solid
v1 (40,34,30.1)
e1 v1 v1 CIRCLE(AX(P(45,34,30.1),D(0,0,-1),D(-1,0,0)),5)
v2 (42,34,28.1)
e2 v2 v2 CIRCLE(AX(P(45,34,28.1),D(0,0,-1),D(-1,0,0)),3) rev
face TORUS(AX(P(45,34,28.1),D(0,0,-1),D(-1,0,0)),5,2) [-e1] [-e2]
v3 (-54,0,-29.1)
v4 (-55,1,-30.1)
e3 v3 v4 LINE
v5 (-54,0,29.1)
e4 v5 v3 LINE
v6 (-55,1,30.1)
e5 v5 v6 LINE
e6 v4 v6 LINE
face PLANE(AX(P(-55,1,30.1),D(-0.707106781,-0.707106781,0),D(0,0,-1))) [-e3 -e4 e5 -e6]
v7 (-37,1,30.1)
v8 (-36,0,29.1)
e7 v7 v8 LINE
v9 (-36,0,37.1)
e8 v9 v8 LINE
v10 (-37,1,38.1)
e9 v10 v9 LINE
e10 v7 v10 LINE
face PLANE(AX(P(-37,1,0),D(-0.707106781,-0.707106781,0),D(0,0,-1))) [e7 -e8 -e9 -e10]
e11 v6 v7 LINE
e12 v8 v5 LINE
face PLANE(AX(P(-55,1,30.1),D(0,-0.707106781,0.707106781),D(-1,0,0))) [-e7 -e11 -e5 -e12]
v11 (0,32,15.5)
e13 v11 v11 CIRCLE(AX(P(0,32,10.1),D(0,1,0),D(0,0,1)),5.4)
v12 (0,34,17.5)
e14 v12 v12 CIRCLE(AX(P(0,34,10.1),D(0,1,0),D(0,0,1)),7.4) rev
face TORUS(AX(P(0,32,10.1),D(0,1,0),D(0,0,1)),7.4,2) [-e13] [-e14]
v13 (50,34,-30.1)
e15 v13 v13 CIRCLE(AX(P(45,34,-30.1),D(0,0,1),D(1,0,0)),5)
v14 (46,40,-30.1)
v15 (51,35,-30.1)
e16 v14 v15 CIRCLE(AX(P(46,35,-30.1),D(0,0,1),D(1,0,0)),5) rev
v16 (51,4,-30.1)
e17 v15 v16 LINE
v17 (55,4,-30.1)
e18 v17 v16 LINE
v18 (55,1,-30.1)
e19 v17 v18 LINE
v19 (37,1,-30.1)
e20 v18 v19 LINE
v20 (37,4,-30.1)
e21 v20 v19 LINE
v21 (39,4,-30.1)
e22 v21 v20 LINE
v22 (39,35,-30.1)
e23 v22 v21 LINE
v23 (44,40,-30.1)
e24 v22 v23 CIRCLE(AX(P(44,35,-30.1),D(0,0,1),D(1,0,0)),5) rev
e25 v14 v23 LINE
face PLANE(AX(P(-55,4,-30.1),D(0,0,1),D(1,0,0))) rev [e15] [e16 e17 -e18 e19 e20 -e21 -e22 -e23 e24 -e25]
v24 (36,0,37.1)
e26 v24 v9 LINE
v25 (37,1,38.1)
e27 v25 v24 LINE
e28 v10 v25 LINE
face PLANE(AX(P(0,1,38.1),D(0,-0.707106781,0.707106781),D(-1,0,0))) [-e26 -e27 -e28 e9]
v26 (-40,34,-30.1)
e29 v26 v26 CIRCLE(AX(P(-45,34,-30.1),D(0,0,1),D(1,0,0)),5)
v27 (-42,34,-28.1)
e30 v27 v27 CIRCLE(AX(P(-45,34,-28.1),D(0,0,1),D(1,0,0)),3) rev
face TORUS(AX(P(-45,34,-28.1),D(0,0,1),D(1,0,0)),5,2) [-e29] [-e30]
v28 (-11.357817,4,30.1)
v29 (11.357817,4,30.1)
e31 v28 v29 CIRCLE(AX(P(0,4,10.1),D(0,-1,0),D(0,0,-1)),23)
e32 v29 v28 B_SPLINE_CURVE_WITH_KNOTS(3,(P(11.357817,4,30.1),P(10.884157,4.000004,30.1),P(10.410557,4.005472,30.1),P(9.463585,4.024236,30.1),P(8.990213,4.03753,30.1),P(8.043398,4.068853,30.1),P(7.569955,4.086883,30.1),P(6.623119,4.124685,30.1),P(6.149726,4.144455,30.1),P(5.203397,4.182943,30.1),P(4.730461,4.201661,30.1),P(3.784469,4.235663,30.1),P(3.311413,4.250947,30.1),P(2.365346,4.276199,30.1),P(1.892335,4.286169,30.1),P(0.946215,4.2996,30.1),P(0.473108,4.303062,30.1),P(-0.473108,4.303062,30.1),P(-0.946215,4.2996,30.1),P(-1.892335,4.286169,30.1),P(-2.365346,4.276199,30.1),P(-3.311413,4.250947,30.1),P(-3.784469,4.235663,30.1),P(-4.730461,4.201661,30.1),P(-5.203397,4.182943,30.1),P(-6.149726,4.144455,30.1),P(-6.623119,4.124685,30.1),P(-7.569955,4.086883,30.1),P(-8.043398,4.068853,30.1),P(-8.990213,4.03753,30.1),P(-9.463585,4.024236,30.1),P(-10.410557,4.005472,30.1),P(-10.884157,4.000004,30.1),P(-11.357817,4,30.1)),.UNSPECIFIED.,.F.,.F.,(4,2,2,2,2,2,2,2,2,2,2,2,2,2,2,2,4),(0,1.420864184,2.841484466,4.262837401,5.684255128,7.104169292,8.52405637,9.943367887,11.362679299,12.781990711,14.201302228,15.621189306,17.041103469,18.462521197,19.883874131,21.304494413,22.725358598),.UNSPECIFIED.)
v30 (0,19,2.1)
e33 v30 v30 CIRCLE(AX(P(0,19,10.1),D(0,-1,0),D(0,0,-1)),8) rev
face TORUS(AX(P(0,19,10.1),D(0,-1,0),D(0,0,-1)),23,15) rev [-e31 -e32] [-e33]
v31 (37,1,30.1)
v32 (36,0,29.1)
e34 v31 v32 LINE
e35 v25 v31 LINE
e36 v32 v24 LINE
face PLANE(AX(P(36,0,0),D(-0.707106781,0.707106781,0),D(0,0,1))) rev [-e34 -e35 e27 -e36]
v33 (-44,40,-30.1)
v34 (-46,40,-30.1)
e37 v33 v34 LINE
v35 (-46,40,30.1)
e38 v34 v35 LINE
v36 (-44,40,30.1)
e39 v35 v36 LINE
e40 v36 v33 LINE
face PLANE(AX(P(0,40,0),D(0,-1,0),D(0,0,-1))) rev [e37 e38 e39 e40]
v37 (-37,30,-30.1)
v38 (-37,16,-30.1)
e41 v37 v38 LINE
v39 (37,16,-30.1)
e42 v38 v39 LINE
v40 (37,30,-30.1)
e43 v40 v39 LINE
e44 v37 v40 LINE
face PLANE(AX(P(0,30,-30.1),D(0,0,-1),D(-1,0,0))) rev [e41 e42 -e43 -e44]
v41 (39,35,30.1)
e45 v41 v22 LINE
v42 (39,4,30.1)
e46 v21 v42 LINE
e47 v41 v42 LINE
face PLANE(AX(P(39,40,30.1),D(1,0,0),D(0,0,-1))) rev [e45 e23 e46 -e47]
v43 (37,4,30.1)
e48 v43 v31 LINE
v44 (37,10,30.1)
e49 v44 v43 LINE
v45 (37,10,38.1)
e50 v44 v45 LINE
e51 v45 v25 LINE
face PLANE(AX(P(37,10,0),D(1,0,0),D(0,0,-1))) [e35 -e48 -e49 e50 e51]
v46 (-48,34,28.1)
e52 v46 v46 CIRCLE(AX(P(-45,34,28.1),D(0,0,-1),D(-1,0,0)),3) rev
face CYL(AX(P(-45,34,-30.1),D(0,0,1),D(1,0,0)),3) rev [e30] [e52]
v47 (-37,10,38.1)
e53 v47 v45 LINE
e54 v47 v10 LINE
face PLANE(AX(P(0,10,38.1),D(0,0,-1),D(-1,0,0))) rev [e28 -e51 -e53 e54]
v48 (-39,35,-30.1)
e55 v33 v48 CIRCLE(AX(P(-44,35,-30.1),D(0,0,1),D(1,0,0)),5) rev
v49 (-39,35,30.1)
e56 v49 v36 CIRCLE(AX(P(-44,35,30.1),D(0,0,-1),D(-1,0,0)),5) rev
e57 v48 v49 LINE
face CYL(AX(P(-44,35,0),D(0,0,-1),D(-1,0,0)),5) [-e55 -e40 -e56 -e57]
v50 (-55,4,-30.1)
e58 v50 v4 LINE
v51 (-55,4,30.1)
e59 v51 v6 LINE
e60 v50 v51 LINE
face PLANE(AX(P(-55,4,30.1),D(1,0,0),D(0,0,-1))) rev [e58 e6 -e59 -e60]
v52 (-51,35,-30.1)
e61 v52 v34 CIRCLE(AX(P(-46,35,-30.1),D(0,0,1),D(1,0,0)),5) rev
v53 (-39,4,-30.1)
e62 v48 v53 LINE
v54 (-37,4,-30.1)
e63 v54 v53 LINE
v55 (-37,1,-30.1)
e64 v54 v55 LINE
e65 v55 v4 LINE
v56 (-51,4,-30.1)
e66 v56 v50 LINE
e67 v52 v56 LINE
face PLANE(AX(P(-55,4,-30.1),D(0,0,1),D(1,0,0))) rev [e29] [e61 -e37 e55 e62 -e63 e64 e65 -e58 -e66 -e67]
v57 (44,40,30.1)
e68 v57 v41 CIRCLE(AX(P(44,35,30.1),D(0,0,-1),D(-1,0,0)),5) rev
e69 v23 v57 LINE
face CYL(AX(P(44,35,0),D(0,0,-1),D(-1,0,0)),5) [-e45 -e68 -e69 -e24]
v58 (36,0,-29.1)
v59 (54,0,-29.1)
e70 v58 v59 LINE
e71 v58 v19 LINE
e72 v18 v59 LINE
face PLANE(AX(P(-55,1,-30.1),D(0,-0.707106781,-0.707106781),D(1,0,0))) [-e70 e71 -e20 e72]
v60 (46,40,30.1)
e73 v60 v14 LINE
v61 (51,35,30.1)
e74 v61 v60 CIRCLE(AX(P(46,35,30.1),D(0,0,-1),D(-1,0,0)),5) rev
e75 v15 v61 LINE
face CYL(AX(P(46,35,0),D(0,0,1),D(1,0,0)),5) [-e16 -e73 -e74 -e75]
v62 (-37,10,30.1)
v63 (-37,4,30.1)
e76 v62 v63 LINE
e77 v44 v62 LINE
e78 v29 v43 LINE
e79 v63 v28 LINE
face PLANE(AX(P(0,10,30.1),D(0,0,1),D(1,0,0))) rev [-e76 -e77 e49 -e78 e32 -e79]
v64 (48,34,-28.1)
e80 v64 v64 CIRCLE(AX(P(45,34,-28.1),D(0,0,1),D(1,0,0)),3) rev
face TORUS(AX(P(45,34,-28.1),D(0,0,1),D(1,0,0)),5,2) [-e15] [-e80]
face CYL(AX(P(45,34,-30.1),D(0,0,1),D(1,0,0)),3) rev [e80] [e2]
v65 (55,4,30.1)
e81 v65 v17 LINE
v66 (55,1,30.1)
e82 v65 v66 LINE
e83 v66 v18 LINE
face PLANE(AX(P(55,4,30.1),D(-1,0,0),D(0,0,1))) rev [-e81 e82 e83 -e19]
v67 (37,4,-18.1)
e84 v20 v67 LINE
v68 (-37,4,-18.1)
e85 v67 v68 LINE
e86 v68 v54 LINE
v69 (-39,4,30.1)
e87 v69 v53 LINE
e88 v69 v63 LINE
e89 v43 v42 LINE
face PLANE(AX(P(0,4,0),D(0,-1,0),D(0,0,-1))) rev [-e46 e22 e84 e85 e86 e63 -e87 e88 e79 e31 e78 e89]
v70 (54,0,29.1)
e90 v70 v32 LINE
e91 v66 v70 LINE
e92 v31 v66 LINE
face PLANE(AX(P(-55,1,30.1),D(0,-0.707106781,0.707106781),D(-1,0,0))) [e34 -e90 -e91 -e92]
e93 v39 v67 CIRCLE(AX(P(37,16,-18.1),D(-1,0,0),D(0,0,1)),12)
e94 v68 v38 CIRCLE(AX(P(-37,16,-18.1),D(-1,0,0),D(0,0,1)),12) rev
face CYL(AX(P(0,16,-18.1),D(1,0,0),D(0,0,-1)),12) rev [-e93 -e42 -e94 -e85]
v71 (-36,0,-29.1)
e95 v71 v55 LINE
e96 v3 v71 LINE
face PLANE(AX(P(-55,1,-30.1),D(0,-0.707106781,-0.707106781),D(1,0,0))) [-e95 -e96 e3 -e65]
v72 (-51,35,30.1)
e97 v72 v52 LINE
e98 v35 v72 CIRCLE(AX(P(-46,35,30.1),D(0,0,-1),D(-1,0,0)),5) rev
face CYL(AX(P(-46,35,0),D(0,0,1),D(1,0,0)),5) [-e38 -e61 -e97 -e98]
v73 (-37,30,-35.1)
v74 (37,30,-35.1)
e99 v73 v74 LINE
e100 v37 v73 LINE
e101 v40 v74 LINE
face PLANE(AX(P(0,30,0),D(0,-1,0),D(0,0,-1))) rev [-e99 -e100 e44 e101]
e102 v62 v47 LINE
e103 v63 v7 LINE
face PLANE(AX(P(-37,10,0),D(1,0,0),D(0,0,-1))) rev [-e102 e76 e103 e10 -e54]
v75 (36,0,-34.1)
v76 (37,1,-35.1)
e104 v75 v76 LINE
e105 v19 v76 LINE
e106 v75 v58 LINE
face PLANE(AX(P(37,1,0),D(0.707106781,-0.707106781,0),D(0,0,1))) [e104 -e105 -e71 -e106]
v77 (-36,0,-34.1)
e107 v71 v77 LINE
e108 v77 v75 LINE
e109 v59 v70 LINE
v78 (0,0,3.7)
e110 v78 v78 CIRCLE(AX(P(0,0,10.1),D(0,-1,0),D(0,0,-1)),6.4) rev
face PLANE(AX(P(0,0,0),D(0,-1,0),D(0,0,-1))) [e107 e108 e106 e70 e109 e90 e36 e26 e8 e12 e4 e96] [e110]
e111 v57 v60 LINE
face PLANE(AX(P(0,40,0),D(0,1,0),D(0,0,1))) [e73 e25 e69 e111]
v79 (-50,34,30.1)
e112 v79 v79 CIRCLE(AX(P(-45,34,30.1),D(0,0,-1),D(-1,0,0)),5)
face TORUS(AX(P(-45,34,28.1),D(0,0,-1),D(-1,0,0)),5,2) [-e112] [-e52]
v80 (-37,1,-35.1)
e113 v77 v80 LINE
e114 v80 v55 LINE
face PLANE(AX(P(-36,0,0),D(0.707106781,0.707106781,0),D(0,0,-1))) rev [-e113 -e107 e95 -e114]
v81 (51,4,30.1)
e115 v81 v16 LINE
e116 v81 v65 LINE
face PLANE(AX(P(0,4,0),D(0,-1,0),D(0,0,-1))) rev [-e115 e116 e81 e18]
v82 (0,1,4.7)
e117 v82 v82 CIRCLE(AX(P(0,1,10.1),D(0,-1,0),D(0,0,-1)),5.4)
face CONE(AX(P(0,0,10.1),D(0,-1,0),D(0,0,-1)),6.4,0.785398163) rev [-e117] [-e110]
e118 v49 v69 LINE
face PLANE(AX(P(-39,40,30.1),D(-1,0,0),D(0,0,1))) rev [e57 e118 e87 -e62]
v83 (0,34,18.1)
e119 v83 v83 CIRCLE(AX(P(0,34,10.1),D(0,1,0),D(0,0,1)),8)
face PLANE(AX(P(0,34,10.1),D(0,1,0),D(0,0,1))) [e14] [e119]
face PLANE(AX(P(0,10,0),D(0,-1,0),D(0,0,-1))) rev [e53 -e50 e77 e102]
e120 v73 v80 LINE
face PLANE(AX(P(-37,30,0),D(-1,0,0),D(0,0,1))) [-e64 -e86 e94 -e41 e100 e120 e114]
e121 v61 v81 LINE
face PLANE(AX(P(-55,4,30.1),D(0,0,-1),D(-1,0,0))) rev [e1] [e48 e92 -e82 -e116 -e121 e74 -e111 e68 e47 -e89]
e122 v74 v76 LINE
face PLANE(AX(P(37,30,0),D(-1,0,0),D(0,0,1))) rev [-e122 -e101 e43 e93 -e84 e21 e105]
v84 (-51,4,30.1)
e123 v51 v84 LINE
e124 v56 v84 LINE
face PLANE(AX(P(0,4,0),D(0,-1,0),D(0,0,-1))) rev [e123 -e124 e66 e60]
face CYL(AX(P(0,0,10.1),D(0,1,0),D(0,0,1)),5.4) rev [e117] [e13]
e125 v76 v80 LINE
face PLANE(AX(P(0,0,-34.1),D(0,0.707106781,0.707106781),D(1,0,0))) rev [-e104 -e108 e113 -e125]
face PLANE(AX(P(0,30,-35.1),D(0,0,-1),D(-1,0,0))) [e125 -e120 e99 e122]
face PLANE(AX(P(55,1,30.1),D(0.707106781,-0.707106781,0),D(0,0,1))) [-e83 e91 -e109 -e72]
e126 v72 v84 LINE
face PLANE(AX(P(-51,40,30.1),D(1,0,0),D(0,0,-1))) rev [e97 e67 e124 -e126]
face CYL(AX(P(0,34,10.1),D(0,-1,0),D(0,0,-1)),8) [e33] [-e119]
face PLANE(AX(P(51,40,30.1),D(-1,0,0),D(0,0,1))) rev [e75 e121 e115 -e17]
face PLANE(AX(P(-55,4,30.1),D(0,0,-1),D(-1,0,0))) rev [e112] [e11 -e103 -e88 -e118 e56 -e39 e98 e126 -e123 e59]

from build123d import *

# Parameters (mm, degrees)
SKETCH_1_W          = 110
SKETCH_1_H          = 60.2
EXTRUDE_1_DEPTH     = 4
SKETCH_2_W          = 12
SKETCH_2_H          = 60.2
EXTRUDE_2_DEPTH     = 36
SKETCH_4_R          = 3
CUT_EXTRUDE_1_DEPTH = 91.824225843
FILLET_1_R          = 5
SKETCH_5_R          = 8
EXTRUDE_3_DEPTH     = 30
SKETCH_6_R          = 5.4
CUT_EXTRUDE_2_DEPTH = 72.323278108
FILLET_3_R          = 2
SKETCH_8_W          = 74
SKETCH_8_H          = 5
EXTRUDE_4_DEPTH     = 30
SKETCH_8_3_W        = 74
SKETCH_8_3_H        = 8
EXTRUDE_5_DEPTH     = 10
CHAMFER_2_SIZE      = 1
FILLET_5_R          = 2
FILLET_6_R          = 12
FILLET_2_R          = 15


with BuildPart() as part:
    # Эскиз1 → Бобышка-Вытянуть1 (new body)
    with BuildSketch(Plane(origin=(0, 0, 0), x_dir=(1, 0, 0), z_dir=(0, 1, 0))):
        Rectangle(SKETCH_1_W, SKETCH_1_H)
    extrude(amount=EXTRUDE_1_DEPTH)

    # Эскиз2 → Бобышка-Вытянуть2 (add)
    with BuildSketch(Plane(origin=(0, 4, 0), x_dir=(1, 0, 0), z_dir=(0, 1, 0))):
        with Locations((-45, 0)):
            Rectangle(SKETCH_2_W, SKETCH_2_H)
        with Locations((45, 0)):
            Rectangle(SKETCH_2_W, SKETCH_2_H)
    extrude(amount=EXTRUDE_2_DEPTH)

    # Эскиз4 → Вырез-Вытянуть1 (cut, through all)
    with BuildSketch(Plane.XY.offset(30.1)):
        with Locations((-45, 34)):
            Circle(SKETCH_4_R)
        with Locations(Location((45, 34, 0), (0, 0, 180))):
            Circle(SKETCH_4_R)
    extrude(amount=-CUT_EXTRUDE_1_DEPTH, mode=Mode.SUBTRACT)

    # Скругление1
    fillet_1_edges = [part.edges().sort_by_distance(p)[0] for p in [
        (-39, 40, 0),
        (-51, 40, 0),
        (51, 40, 0),
        (39, 40, 0),
    ]]
    fillet(fillet_1_edges, radius=FILLET_1_R)

    # Эскиз5 → Бобышка-Вытянуть3 (add)
    with BuildSketch(Plane(origin=(0, 4, 0), x_dir=(1, 0, 0), z_dir=(0, 1, 0))):
        with Locations(Location((0, -10.1, 0), (0, 0, 90))):
            Circle(SKETCH_5_R)
    extrude(amount=EXTRUDE_3_DEPTH)

    # Эскиз6 → Вырез-Вытянуть2 (cut, through all)
    with BuildSketch(Plane(origin=(0, 34, 0), x_dir=(1, 0, 0), z_dir=(0, 1, 0))):
        with Locations(Location((0, -10.1, 0), (0, 0, 270))):
            Circle(SKETCH_6_R)
    extrude(amount=-CUT_EXTRUDE_2_DEPTH, mode=Mode.SUBTRACT)

    # Скругление3
    fillet_3_edges = [part.edges().sort_by_distance(p)[0] for p in [
        (0, 34, 4.7),
    ]]
    fillet(fillet_3_edges, radius=FILLET_3_R)

    # Эскиз8 → Бобышка-Вытянуть4 (add)
    with BuildSketch(Plane(origin=(0, 0, 0), x_dir=(1, 0, 0), z_dir=(0, 1, 0))):
        with Locations((0, 32.6)):
            Rectangle(SKETCH_8_W, SKETCH_8_H)
    extrude(amount=EXTRUDE_4_DEPTH)

    # Эскиз8<3> → Бобышка-Вытянуть5 (add)
    with BuildSketch(Plane(origin=(0, 0, 0), x_dir=(1, 0, 0), z_dir=(0, 1, 0))):
        with Locations((0, -34.1)):
            Rectangle(SKETCH_8_3_W, SKETCH_8_3_H)
    extrude(amount=EXTRUDE_5_DEPTH)

    # Фаска2
    chamfer_2_edges = [part.edges().sort_by_distance(p)[0] for p in [
        (46, 0, 30.1),
        (-37, 0, 34.1),
        (0, 0, 38.1),
        (37, 0, 34.1),
        (-46, 0, 30.1),
        (-55, 0, 0),
        (46, 0, -30.1),
        (55, 0, 0),
        (0, 0, 4.7),
        (-46, 0, -30.1),
        (37, 0, -32.6),
        (-37, 0, -32.6),
        (0, 0, -35.1),
    ]]
    chamfer(chamfer_2_edges, length=CHAMFER_2_SIZE)

    # Скругление5
    fillet_5_edges = [part.edges().sort_by_distance(p)[0] for p in [
        (-48, 34, -30.1),
        (-48, 34, 30.1),
        (48, 34, -30.1),
        (48, 34, 30.1),
    ]]
    fillet(fillet_5_edges, radius=FILLET_5_R)

    # Скругление6
    fillet_6_edges = [part.edges().sort_by_distance(p)[0] for p in [
        (0, 4, -30.1),
    ]]
    fillet(fillet_6_edges, radius=FILLET_6_R)

    # Скругление2
    # the kernel refuses this fillet: 15 mm, written as the material it adds along each edge
    with BuildSketch(Plane(origin=(0, 4, 10.1), x_dir=(0, 0, -1), z_dir=(1, 0, 0))) as fillet_2_piece_1:
        with BuildLine():
            CenterArc((8 + FILLET_2_R, FILLET_2_R), FILLET_2_R, 180, 90)
            Line((8, FILLET_2_R), (8, 0))
            Line((8, 0), (8 + FILLET_2_R, 0))
        make_face()
    revolve(axis=Axis((0, 4, 10.1), (0, 1, 0)))


solid = part.part
